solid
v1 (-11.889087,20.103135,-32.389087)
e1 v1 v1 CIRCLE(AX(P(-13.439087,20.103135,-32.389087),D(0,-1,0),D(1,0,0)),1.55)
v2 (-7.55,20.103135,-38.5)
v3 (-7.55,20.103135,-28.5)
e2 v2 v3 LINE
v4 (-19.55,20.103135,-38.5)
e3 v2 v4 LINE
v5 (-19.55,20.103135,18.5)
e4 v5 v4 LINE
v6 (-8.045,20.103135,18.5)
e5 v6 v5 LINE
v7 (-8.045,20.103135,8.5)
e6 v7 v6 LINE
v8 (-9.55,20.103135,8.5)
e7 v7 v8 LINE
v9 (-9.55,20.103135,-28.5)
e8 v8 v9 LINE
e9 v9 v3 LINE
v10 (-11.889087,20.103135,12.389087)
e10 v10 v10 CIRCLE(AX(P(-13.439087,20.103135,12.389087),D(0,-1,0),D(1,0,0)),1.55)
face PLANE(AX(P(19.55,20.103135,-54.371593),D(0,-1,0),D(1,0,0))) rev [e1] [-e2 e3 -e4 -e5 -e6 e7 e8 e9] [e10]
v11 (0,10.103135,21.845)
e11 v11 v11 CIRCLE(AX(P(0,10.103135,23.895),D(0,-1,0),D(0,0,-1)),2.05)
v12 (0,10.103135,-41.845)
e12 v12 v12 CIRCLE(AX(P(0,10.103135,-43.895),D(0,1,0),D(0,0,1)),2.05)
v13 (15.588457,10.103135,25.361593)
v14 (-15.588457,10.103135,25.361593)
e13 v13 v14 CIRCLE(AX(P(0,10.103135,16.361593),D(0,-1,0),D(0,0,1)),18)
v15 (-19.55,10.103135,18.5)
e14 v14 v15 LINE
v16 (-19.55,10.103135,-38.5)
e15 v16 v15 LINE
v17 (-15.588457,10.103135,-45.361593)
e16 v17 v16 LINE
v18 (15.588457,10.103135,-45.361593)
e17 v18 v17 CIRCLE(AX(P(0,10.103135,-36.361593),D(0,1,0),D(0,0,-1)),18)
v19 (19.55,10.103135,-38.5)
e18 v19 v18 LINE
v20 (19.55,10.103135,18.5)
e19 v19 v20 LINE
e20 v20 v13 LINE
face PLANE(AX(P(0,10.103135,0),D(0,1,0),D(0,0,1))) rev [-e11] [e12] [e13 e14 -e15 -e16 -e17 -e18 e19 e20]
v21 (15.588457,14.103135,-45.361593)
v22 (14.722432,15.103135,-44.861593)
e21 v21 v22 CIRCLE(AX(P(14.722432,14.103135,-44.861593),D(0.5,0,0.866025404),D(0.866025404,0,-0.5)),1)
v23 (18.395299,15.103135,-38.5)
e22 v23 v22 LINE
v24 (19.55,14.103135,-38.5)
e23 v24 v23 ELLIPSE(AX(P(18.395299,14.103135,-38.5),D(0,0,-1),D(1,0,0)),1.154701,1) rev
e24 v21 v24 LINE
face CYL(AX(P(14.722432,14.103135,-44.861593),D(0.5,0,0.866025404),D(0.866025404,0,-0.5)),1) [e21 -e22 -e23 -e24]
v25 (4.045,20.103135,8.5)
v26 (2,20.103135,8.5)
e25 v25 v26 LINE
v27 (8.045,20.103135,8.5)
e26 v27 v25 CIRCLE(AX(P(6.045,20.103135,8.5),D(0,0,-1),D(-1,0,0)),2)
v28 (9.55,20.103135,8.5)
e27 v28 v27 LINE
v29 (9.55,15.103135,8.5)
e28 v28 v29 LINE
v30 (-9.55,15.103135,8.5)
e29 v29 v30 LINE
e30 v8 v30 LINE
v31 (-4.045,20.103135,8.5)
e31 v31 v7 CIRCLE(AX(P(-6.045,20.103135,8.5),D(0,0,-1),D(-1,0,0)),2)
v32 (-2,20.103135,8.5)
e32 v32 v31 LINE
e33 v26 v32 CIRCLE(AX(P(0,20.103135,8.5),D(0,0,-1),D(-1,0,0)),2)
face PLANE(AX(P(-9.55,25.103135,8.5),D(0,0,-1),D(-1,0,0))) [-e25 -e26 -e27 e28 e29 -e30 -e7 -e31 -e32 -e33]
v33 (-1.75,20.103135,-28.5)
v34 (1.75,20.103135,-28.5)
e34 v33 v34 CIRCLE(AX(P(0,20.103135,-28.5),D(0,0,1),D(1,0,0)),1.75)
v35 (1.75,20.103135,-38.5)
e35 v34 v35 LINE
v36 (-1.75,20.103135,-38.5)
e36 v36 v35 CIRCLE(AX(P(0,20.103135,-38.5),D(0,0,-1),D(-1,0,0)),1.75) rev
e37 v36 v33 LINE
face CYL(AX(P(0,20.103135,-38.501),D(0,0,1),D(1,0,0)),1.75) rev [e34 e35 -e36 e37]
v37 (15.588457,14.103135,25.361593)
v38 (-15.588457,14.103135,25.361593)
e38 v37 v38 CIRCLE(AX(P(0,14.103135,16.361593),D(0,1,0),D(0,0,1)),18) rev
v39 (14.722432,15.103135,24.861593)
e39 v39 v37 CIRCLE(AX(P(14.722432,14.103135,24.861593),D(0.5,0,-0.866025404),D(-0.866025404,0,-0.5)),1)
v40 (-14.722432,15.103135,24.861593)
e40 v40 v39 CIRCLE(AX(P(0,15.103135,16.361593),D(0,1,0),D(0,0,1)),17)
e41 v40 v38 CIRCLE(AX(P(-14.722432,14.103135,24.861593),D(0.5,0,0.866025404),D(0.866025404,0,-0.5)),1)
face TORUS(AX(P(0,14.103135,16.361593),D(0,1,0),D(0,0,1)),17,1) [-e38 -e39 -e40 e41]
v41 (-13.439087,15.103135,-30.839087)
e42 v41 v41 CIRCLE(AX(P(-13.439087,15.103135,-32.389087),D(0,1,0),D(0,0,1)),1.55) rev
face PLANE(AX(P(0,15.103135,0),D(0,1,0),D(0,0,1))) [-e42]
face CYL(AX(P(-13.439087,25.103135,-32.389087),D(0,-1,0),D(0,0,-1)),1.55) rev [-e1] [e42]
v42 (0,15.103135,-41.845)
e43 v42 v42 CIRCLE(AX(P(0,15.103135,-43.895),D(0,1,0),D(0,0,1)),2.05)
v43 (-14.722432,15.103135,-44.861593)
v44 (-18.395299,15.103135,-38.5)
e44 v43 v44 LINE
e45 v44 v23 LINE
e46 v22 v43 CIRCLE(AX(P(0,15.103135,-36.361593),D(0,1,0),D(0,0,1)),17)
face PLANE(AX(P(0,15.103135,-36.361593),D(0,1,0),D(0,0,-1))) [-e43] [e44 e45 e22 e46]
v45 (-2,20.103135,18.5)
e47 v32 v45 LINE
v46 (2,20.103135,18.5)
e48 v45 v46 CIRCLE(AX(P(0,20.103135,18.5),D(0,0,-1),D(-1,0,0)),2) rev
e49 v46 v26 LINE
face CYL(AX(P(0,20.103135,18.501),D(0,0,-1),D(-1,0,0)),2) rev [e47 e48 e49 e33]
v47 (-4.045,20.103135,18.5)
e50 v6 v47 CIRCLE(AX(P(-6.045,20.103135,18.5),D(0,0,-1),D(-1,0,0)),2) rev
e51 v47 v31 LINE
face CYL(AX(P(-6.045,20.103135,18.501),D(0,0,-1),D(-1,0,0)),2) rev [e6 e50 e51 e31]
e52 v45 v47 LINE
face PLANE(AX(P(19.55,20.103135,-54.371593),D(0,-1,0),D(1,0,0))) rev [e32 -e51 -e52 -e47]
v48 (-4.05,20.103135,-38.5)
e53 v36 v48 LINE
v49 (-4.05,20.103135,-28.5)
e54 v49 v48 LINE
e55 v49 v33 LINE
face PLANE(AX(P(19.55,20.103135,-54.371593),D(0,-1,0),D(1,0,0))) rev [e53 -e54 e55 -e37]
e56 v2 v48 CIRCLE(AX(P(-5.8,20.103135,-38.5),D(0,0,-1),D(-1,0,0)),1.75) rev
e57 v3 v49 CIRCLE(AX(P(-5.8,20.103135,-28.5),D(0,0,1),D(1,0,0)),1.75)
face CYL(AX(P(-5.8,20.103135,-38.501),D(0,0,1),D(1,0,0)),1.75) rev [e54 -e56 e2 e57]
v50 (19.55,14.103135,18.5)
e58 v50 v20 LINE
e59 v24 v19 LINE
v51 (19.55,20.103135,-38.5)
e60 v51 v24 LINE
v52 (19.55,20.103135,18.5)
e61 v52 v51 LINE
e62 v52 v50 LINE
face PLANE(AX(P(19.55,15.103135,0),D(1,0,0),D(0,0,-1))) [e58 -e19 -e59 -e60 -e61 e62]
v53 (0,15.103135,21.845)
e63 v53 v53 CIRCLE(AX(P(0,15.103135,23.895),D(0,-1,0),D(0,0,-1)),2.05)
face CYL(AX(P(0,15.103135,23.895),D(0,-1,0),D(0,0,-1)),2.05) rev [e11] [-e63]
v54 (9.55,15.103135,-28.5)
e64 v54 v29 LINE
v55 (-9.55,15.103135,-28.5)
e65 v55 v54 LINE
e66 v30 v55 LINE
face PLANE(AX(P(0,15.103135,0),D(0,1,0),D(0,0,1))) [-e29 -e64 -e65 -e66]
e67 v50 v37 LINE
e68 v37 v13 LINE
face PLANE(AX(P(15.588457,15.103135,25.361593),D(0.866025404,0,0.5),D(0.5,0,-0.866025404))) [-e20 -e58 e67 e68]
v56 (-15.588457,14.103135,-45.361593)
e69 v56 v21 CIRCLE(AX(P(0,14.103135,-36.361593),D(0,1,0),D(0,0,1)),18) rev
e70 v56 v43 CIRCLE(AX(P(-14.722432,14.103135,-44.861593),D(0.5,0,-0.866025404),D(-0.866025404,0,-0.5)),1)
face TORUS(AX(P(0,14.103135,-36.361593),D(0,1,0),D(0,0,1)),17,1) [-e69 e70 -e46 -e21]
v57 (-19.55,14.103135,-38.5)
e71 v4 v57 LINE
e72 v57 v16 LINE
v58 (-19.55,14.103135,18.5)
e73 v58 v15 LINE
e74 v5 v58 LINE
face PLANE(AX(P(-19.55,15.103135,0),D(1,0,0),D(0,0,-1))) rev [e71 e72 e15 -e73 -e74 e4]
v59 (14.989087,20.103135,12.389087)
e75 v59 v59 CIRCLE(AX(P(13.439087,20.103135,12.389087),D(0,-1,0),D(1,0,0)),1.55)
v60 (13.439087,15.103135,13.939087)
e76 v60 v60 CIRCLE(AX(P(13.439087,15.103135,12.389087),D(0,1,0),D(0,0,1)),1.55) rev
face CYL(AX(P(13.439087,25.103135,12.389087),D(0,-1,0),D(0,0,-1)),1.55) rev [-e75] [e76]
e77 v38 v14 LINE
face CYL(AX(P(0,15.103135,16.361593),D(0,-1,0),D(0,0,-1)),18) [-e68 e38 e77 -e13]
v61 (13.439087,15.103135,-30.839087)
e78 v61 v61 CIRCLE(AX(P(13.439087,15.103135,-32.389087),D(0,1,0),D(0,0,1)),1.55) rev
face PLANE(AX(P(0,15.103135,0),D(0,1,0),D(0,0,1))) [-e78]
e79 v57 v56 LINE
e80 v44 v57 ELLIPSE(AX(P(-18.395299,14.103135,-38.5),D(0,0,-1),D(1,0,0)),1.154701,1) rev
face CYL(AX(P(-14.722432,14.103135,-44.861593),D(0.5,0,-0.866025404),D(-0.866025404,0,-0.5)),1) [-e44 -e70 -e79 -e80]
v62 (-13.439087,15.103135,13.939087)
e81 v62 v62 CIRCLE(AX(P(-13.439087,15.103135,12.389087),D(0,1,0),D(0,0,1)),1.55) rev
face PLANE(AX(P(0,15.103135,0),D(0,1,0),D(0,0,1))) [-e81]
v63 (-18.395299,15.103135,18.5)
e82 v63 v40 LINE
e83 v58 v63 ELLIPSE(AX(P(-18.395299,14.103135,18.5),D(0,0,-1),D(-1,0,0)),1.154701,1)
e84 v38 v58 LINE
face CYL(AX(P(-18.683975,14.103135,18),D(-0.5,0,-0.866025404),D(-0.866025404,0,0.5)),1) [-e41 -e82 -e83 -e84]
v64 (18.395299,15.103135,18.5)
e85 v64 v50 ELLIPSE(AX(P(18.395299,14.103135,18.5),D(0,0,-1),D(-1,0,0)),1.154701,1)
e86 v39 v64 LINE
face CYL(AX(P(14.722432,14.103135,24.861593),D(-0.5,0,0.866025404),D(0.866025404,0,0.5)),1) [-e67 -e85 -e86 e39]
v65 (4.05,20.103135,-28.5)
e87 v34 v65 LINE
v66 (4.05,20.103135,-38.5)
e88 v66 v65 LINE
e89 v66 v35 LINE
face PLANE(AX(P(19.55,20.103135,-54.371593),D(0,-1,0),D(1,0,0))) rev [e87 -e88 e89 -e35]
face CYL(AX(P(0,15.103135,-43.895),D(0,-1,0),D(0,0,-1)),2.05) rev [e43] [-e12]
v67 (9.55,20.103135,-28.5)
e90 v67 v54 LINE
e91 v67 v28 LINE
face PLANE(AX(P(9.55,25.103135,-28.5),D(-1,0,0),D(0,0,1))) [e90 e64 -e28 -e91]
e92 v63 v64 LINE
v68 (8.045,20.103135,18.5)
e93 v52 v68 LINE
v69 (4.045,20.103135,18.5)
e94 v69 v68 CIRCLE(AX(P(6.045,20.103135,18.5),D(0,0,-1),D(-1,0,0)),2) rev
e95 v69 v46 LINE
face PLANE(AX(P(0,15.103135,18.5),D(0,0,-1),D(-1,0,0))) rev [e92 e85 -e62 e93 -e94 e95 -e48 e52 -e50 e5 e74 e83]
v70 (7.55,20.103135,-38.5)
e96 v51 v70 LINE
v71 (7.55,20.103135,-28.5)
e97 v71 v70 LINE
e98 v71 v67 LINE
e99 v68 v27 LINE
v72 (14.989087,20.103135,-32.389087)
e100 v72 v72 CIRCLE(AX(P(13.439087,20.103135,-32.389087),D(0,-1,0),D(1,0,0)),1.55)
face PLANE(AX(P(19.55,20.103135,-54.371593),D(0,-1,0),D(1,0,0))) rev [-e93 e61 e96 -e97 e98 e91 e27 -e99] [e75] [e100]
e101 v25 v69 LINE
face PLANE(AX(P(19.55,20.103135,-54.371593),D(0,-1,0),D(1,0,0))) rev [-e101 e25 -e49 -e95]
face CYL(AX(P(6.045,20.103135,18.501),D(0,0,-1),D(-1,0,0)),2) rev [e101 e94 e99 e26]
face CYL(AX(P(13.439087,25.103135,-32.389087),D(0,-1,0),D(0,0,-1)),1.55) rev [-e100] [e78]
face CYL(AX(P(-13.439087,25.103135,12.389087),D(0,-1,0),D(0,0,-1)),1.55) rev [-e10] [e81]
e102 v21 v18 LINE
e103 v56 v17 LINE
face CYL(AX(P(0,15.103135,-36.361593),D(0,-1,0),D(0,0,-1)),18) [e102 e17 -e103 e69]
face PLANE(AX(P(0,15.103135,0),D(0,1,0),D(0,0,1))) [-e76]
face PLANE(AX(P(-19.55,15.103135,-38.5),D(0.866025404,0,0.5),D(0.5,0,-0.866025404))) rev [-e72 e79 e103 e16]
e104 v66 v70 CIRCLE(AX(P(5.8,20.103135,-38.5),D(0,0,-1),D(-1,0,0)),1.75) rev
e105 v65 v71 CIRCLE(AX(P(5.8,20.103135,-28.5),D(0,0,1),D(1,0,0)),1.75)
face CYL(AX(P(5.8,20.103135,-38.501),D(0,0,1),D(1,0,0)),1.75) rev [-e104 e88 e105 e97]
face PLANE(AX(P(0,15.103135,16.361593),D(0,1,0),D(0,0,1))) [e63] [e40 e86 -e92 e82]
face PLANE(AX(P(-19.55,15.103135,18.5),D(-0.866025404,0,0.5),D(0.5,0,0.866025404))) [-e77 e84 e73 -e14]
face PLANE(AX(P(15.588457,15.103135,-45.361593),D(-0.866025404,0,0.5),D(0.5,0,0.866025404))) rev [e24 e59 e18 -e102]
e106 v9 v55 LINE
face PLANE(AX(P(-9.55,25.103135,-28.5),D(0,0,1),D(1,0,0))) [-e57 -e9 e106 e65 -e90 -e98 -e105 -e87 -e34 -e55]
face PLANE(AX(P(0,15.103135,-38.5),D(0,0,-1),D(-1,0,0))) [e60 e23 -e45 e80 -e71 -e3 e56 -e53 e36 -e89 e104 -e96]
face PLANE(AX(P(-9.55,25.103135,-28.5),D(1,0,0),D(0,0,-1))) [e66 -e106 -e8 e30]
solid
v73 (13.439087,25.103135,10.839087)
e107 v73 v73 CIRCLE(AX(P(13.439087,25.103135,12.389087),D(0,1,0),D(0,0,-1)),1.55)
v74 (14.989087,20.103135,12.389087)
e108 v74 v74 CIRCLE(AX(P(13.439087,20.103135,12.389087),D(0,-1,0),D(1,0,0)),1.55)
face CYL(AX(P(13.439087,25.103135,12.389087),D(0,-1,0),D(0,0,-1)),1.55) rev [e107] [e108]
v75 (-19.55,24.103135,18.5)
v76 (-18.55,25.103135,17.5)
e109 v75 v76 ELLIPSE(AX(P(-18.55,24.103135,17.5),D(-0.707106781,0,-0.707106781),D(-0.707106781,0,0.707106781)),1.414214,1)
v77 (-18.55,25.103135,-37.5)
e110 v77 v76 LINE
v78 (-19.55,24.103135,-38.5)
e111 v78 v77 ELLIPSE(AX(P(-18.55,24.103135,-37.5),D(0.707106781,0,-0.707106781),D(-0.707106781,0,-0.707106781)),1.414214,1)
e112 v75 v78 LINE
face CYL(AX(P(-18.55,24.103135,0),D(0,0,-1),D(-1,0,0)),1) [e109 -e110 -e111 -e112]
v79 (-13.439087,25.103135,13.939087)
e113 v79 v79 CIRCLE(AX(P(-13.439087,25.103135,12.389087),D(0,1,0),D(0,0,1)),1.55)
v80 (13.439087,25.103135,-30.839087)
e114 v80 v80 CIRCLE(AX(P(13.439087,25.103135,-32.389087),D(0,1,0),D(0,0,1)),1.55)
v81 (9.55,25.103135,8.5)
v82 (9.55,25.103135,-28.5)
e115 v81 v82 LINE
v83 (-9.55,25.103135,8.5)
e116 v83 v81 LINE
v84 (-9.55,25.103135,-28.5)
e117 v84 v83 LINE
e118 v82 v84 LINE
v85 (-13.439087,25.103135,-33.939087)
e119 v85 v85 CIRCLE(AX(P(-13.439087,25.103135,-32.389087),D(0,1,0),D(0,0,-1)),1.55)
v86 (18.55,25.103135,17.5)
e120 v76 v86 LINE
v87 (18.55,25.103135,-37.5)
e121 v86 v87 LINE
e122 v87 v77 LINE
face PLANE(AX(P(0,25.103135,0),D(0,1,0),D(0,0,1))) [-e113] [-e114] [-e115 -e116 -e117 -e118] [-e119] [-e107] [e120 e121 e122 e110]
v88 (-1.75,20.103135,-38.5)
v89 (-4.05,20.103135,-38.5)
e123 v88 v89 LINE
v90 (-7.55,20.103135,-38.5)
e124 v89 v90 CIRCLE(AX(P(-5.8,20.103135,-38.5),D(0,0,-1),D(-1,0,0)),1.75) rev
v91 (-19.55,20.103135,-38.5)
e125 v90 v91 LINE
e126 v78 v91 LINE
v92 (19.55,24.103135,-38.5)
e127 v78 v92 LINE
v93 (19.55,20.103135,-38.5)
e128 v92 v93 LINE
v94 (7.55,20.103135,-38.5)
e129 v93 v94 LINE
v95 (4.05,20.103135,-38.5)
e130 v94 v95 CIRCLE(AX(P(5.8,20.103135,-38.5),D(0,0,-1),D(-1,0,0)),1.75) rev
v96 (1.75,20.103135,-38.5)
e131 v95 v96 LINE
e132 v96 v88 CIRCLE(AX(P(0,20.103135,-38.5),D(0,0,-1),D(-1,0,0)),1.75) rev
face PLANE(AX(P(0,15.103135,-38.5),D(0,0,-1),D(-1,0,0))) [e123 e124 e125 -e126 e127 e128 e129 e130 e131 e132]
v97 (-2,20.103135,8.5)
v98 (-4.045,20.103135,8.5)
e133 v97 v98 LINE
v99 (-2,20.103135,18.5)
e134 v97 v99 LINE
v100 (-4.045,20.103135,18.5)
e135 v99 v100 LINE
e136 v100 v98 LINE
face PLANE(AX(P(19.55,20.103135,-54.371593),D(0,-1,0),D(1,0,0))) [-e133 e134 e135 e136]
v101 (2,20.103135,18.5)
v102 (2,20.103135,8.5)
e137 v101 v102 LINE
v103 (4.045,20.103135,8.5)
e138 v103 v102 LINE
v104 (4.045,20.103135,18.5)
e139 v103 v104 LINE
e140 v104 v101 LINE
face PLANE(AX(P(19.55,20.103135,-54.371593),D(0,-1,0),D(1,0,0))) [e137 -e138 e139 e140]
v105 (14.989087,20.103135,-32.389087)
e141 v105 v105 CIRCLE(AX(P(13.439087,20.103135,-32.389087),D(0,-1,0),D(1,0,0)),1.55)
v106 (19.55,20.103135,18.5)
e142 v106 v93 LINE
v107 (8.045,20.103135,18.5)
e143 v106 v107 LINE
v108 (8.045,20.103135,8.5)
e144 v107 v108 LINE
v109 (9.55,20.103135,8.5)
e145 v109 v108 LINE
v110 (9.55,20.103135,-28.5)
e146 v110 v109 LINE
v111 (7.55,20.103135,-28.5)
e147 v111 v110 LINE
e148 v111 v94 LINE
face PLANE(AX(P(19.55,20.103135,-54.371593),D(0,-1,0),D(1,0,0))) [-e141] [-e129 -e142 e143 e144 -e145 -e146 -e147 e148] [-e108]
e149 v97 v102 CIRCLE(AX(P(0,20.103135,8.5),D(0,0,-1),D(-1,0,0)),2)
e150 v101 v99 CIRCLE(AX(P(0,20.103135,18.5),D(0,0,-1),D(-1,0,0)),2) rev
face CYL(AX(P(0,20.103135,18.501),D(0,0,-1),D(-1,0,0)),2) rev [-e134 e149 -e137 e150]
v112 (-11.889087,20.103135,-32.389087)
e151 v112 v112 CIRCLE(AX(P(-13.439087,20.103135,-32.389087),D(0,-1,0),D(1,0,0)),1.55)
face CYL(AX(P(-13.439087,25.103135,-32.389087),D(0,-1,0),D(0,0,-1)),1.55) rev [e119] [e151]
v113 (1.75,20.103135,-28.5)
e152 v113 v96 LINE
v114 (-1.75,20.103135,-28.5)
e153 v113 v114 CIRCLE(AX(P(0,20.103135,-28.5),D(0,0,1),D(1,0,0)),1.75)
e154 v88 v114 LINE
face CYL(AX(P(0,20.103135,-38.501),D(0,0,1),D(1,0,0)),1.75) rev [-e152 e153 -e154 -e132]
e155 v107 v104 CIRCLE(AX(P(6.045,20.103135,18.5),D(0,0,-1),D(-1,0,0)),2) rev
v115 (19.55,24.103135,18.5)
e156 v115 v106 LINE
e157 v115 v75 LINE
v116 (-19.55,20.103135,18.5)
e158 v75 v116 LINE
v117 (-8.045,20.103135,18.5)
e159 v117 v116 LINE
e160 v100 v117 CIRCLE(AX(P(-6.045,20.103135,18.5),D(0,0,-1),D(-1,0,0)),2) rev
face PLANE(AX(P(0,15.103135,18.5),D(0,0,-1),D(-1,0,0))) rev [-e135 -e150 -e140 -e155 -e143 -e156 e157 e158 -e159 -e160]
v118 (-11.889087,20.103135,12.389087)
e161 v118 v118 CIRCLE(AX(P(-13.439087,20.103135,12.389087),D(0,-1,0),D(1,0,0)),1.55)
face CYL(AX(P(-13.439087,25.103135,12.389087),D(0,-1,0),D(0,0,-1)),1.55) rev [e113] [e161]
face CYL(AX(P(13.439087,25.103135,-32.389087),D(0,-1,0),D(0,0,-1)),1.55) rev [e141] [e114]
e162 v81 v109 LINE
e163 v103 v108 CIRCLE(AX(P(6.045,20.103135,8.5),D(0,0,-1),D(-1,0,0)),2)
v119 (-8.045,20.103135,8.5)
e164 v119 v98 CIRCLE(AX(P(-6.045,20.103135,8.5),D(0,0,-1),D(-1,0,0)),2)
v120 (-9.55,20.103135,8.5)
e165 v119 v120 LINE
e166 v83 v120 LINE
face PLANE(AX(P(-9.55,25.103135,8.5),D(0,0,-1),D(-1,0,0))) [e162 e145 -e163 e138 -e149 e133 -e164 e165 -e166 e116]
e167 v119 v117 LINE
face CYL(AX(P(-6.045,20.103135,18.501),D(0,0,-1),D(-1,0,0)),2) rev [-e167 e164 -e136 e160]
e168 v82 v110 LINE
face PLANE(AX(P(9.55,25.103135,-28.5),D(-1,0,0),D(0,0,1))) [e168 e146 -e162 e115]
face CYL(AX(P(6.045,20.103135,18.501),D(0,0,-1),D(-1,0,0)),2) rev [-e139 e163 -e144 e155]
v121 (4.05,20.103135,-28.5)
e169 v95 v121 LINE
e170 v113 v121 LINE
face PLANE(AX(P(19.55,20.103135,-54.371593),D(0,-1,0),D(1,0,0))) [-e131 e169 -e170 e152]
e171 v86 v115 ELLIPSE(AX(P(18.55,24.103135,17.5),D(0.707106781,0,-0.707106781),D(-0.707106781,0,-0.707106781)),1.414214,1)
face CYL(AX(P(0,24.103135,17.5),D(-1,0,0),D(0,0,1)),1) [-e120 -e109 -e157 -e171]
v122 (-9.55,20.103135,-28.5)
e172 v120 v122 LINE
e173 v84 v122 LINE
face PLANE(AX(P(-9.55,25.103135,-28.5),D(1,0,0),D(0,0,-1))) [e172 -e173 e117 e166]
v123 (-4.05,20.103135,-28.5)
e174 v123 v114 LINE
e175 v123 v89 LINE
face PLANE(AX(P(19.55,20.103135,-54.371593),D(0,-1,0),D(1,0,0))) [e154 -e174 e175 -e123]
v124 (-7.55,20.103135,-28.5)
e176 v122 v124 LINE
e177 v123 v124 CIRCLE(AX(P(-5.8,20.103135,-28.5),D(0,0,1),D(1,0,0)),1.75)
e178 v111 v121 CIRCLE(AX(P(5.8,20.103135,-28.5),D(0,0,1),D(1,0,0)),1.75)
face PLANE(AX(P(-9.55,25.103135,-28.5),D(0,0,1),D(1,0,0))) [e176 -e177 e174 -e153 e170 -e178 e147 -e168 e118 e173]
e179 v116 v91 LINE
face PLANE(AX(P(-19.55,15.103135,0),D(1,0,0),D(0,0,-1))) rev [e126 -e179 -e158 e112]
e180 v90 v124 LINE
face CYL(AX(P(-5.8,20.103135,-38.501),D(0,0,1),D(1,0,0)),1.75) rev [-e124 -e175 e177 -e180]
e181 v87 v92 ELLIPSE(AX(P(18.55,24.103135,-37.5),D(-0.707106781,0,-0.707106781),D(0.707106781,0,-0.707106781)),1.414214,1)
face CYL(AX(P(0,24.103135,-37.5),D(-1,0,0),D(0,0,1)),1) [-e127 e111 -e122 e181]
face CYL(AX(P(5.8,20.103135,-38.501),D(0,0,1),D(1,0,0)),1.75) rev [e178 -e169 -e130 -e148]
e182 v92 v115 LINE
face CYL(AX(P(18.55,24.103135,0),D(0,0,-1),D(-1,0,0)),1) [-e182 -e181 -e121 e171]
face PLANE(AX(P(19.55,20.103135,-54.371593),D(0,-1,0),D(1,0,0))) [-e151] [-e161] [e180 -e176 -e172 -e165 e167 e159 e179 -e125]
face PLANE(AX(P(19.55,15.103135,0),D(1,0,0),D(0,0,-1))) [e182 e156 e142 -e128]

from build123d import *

# Parameters (mm, degrees)
BOSS_EXTRU_1_DEPTH           = 20
CONG_1_R                     = 0.5
CONG_2_R                     = 1
ESQUISSE3_W                  = 39.099999999999994
ESQUISSE3_H                  = 57
ESQUISSE3_R                  = 1.5499999999999992
ESQUISSE3_R_2                = 1.5499999999999883
ESQUISSE3_W_2                = 19.1
ESQUISSE3_H_2                = 37
BOSS_EXTRU_2_DEPTH           = 5
ESQUISSE3_3_W                = 39.099999999999994
ESQUISSE3_3_H                = 57
ESQUISSE3_3_R                = 1.5499999999999992
ESQUISSE3_3_R_2              = 1.5499999999999883
ESQUISSE3_3_W_2              = 19.1
ESQUISSE3_3_H_2              = 37
BOSS_EXTRU_4_DEPTH           = 15
TROUS_MOTEUR_REACH           = 58.757
ESQUISSE8_R                  = 1.7500000000000038
ESQUISSE8_R_2                = 1.750000000000003
ENL_V_MAT_EXTRU_1_DEPTH      = 50.94617008369277
TROUS_CABLES_PUISSANCE_REACH = 58.757
ESQUISSE9_R                  = 2
ESQUISSE9_R_2                = 2.000000000000005
ESQUISSE9_R_3                = 2.0000000000000053
ENL_V_MAT_EXTRU_5_REACH      = 51.946
ESQUISSE12_W                 = 5.9
ESQUISSE12_H                 = 1.620000000000001
ESQUISSE13_R                 = 2.05
BOSS_EXTRU_5_DEPTH           = 5
CONG_3_R                     = 1
FRACTIONNER1_SURFACE_1_BACK  = 99.11
FRACTIONNER1_SURFACE_1_DEPTH = 198.22
FRACTIONNER1_SURFACE_2_BACK  = 99.11
FRACTIONNER1_SURFACE_2_DEPTH = 198.22


with BuildPart() as part:
    # Esquisse1 → Boss.-Extru.1 (new body)
    with BuildSketch(Plane.XY):
        Polygon((-1.176e-14, 10.103135382441117), (-2.578e-14, 4.840000000000001), (3.5, 4.840000000000001), (5.71, 6.983135382441116), (5.71, 8.483135382441116), (2.95, 8.483135382441116), (2.95, 10.103135382441117), align=None)
        Polygon((-3.5, 4.840000000000001), (-2.576e-14, 4.840000000000001), (-1.176e-14, 10.103135382441117), (-2.95, 10.103135382441117), (-2.95, 8.483135382441116), (-5.71, 8.483135382441116), (-5.71, 6.983135382441116), align=None)
    extrude(amount=-BOSS_EXTRU_1_DEPTH)

    # Congé1
    cong_1_edges = [part.edges().sort_by_distance(p)[0] for p in [
        (5.71, 7.733135382441116, 0),
        (4.605, 5.911567691220558, 0),
        (0, 4.840000000000001, 0),
        (-4.605, 5.911567691220558, 0),
        (-5.71, 7.733135382441116, 0),
        (-5.71, 7.733135382441116, -20),
        (-4.605, 5.911567691220558, -20),
        (0, 4.840000000000001, -20),
        (4.605, 5.911567691220558, -20),
        (5.71, 7.733135382441116, -20),
    ]]
    fillet(cong_1_edges, radius=CONG_1_R)

    # Congé2
    # the kernel refuses this fillet: 1 mm, written as the material it takes off along each edge
    with BuildSketch(Plane(origin=(4.71, 7.4063748668930085, -20), x_dir=(1, 0, 0), z_dir=(0, 1, 0))) as cong_2_piece_1:
        with BuildLine():
            CenterArc((0.5, -0.5), 0.5, 0, 90)
            Line((1, -0.5), (1, 0))
            Line((1, 0), (0.5, 0))
        make_face()
    revolve(axis=Axis((4.71, 7.4063748668930085, -20), (0, 0, -1)), revolution_arc=45.87999999999987, mode=Mode.SUBTRACT)
    with BuildSketch(Plane(origin=(-4.710000000000001, 7.40637486689301, -20), x_dir=(-0.6961634275566162, -0.717883334625219, 0), z_dir=(0.717883334625219, -0.6961634275566162, 0))) as cong_2_piece_2:
        with BuildLine():
            CenterArc((0.5, -0.5), 0.5, 0, 90)
            Line((1, -0.5), (1, 0))
            Line((1, 0), (0.5, 0))
        make_face()
    revolve(axis=Axis((-4.710000000000001, 7.40637486689301, -20), (0, 0, -1)), revolution_arc=45.87999999999987, mode=Mode.SUBTRACT)
    with BuildSketch(Plane(origin=(4.71, 7.4063748668930085, 0), x_dir=(0.6961634275566162, -0.717883334625219, 0), z_dir=(-0.717883334625219, -0.6961634275566162, 0))) as cong_2_piece_3:
        with BuildLine():
            CenterArc((0.5, -0.5), 0.5, 0, 90)
            Line((1, -0.5), (1, 0))
            Line((1, 0), (0.5, 0))
        make_face()
    revolve(axis=Axis((4.71, 7.4063748668930085, 0), (0, 0, 1)), revolution_arc=45.87999999999987, mode=Mode.SUBTRACT)
    with BuildSketch(Plane(origin=(-4.710000000000001, 7.40637486689301, 0), x_dir=(-1, 0, 0), z_dir=(0, 1, 0))) as cong_2_piece_4:
        with BuildLine():
            CenterArc((0.5, -0.5), 0.5, 0, 90)
            Line((1, -0.5), (1, 0))
            Line((1, 0), (0.5, 0))
        make_face()
    revolve(axis=Axis((-4.710000000000001, 7.40637486689301, 0), (0, 0, 1)), revolution_arc=45.87999999999987, mode=Mode.SUBTRACT)
    with BuildSketch(Plane(origin=(-5.71, 6.983135382441116, 1.1e-16), x_dir=(0.717883334625219, -0.6961634275566161, 0), z_dir=(0, 0, -1))) as cong_2_piece_5:
        with BuildLine():
            CenterArc((CONG_2_R * 0.423239484452, -CONG_2_R), CONG_2_R, 90.00000000000003, 45.879999999999825)
            Line((-CONG_2_R * 0.294643850173, -CONG_2_R * 0.303836572443), (0, 0))
            Line((0, 0), (CONG_2_R * 0.423239484452, 0))
        make_face()
    extrude(amount=20, mode=Mode.SUBTRACT)
    with BuildSketch(Plane(origin=(5.71, 6.983135382441116, 1.1e-16), x_dir=(-0.7178833346252179, -0.6961634275566172, 0), z_dir=(0, 0, -1))) as cong_2_piece_6:
        with BuildLine():
            CenterArc((CONG_2_R * 0.423239484452, CONG_2_R), CONG_2_R, 224.12000000000015, 45.87999999999994)
            Line((-CONG_2_R * 0.294643850173, CONG_2_R * 0.303836572443), (0, 0))
            Line((0, 0), (CONG_2_R * 0.423239484452, 2e-17))
        make_face()
    extrude(amount=20, mode=Mode.SUBTRACT)

    # Esquisse3 → Boss.-Extru.2 (add)
    # profile 1 of 6: a face of its own
    with BuildSketch(Plane(origin=(0, 10.103135382441117, 0), x_dir=(1, 0, 0), z_dir=(0, 1, 0))):
        with Locations((0, 10)):
            Rectangle(ESQUISSE3_W, ESQUISSE3_H)
        with Locations((13.43908729652601, -12.389087296526013)):
            Circle(ESQUISSE3_R, mode=Mode.SUBTRACT)
        with Locations((-13.43908729652601, -12.389087296526013)):
            Circle(ESQUISSE3_R, mode=Mode.SUBTRACT)
        with Locations((13.439087296526004, 32.389087296526014)):
            Circle(ESQUISSE3_R_2, mode=Mode.SUBTRACT)
        with Locations((-13.439087296526015, 32.389087296526014)):
            Circle(ESQUISSE3_R_2, mode=Mode.SUBTRACT)
        with Locations((1.78e-15, 10.000000000000004)):
            Rectangle(ESQUISSE3_W_2, ESQUISSE3_H_2, mode=Mode.SUBTRACT)
    # profile 2 of 6: a face of its own
    with BuildSketch(Plane(origin=(0, 10.103135382441117, 0), x_dir=(1, 0, 0), z_dir=(0, 1, 0))):
        with Locations((13.439087296526004, 32.389087296526014)):
            Circle(ESQUISSE3_R_2)
    # profile 3 of 6: a face of its own
    with BuildSketch(Plane(origin=(0, 10.103135382441117, 0), x_dir=(1, 0, 0), z_dir=(0, 1, 0))):
        with Locations((-13.439087296526015, 32.389087296526014)):
            Circle(ESQUISSE3_R_2)
    # profile 4 of 6: a face of its own
    with BuildSketch(Plane(origin=(0, 10.103135382441117, 0), x_dir=(1, 0, 0), z_dir=(0, 1, 0))):
        with Locations((-13.43908729652601, -12.389087296526013)):
            Circle(ESQUISSE3_R)
    # profile 5 of 6: a face of its own
    with BuildSketch(Plane(origin=(0, 10.103135382441117, 0), x_dir=(1, 0, 0), z_dir=(0, 1, 0))):
        with Locations((13.43908729652601, -12.389087296526013)):
            Circle(ESQUISSE3_R)
    # profile 6 of 6: a face of its own
    with BuildSketch(Plane(origin=(0, 10.103135382441117, 0), x_dir=(1, 0, 0), z_dir=(0, 1, 0))):
        Polygon((-9.549999999999999, 28.500000000000004), (-9.549999999999999, -8.499999999999996), (9.550000000000002, -8.499999999999998), (9.550000000000002, 28.500000000000004), align=None)
    extrude(amount=BOSS_EXTRU_2_DEPTH)

    # Esquisse3<3> → Boss.-Extru.4 (add)
    with BuildSketch(Plane(origin=(0, 10.103135382441117, 0), x_dir=(1, 0, 0), z_dir=(0, 1, 0))):
        with Locations((0, 10)):
            Rectangle(ESQUISSE3_3_W, ESQUISSE3_3_H)
        with Locations(Location((-13.43908729652601, -12.389087296526013, 0), (0, 0, 270))):
            Circle(ESQUISSE3_3_R, mode=Mode.SUBTRACT)
        with Locations(Location((13.43908729652601, -12.389087296526013, 0), (0, 0, 90))):
            Circle(ESQUISSE3_3_R, mode=Mode.SUBTRACT)
        with Locations(Location((13.439087296526004, 32.389087296526014, 0), (0, 0, 270))):
            Circle(ESQUISSE3_3_R_2, mode=Mode.SUBTRACT)
        with Locations(Location((-13.439087296526015, 32.389087296526014, 0), (0, 0, 90))):
            Circle(ESQUISSE3_3_R_2, mode=Mode.SUBTRACT)
        with Locations((1.78e-15, 10.000000000000004)):
            Rectangle(ESQUISSE3_3_W_2, ESQUISSE3_3_H_2, mode=Mode.SUBTRACT)
    extrude(amount=BOSS_EXTRU_4_DEPTH)

    # Esquisse8 → Trous_moteur (cut, up to next)
    with BuildSketch(Plane.XY.offset(-28.500000000000004), mode=Mode.PRIVATE) as trous_moteur_sk1:
        with Locations((5.800000000000003, 20.103135382441113)):
            Circle(ESQUISSE8_R)
    trous_moteur_tool1 = extrude(trous_moteur_sk1.sketch, amount=-TROUS_MOTEUR_REACH, mode=Mode.PRIVATE) & part.part
    # Esquisse8 → Trous_moteur (cut, up to next)
    with BuildSketch(Plane.XY.offset(-28.500000000000004), mode=Mode.PRIVATE) as trous_moteur_sk2:
        with Locations((3.47e-15, 20.10313538244111)):
            Circle(ESQUISSE8_R_2)
    trous_moteur_tool2 = extrude(trous_moteur_sk2.sketch, amount=-TROUS_MOTEUR_REACH, mode=Mode.PRIVATE) & part.part
    # Esquisse8 → Trous_moteur (cut, up to next)
    with BuildSketch(Plane.XY.offset(-28.500000000000004), mode=Mode.PRIVATE) as trous_moteur_sk3:
        with Locations((-5.799999999999996, 20.10313538244111)):
            Circle(ESQUISSE8_R)
    trous_moteur_tool3 = extrude(trous_moteur_sk3.sketch, amount=-TROUS_MOTEUR_REACH, mode=Mode.PRIVATE) & part.part
    add(trous_moteur_tool1.solids().sort_by_distance((5.8, 20.103135, -28.5))[0], mode=Mode.SUBTRACT)
    add(trous_moteur_tool2.solids().sort_by_distance((0, 20.103135, -28.5))[0], mode=Mode.SUBTRACT)
    add(trous_moteur_tool3.solids().sort_by_distance((-5.8, 20.103135, -28.5))[0], mode=Mode.SUBTRACT)

    # Esquisse5 → Enlèv. mat.-Extru.1 (cut, through all)
    with BuildSketch(Plane.XY):
        with BuildLine():
            Line((-5.209999999999999, 8.483135382441116), (-5.71, 8.483135382441116))
            Line((-5.71, 8.483135382441116), (-5.71, 7.4063748668930085))
            ThreePointArc((-5.71, 7.4063748668930085), (-5.630913521335368, 7.01660790289825), (-5.406163427556616, 6.68849153226779))
            Line((-5.406163427556616, 6.68849153226779), (-3.5, 4.840000000000001))
            Line((-3.5, 4.840000000000001), (3.5, 4.840000000000001))
            Line((3.5, 4.840000000000001), (5.406163427556617, 6.68849153226779))
            ThreePointArc((5.406163427556617, 6.68849153226779), (5.630913521335369, 7.01660790289825), (5.71, 7.406374866893009))
            Line((5.71, 7.406374866893009), (5.71, 8.483135382441116))
            Line((5.71, 8.483135382441116), (5.209999999999999, 8.483135382441116))
            Line((5.209999999999999, 8.483135382441116), (2.95, 8.483135382441116))
            Line((2.95, 8.483135382441116), (-2.95, 8.483135382441116))
            Line((-2.95, 8.483135382441116), (-5.209999999999999, 8.483135382441116))
        make_face()
    extrude(amount=-ENL_V_MAT_EXTRU_1_DEPTH, mode=Mode.SUBTRACT)

    # Esquisse9 → Trous_cables_puissance (cut, up to next)
    with BuildSketch(Plane(origin=(0, 0, 8.499999999999998), x_dir=(-1, 0, 0), z_dir=(0, 0, -1)), mode=Mode.PRIVATE) as trous_cables_puissance_sk1:
        with Locations((6.044999999999998, 20.103135382441113)):
            Circle(ESQUISSE9_R)
    trous_cables_puissance_tool1 = extrude(trous_cables_puissance_sk1.sketch, amount=-TROUS_CABLES_PUISSANCE_REACH, mode=Mode.PRIVATE) & part.part
    # Esquisse9 → Trous_cables_puissance (cut, up to next)
    with BuildSketch(Plane(origin=(0, 0, 8.499999999999998), x_dir=(-1, 0, 0), z_dir=(0, 0, -1)), mode=Mode.PRIVATE) as trous_cables_puissance_sk2:
        with Locations((-6.045000000000002, 20.103135382441113)):
            Circle(ESQUISSE9_R_2)
    trous_cables_puissance_tool2 = extrude(trous_cables_puissance_sk2.sketch, amount=-TROUS_CABLES_PUISSANCE_REACH, mode=Mode.PRIVATE) & part.part
    # Esquisse9 → Trous_cables_puissance (cut, up to next)
    with BuildSketch(Plane(origin=(0, 0, 8.499999999999998), x_dir=(-1, 0, 0), z_dir=(0, 0, -1)), mode=Mode.PRIVATE) as trous_cables_puissance_sk3:
        with Locations((-1.73e-15, 20.103135382441113)):
            Circle(ESQUISSE9_R_3)
    trous_cables_puissance_tool3 = extrude(trous_cables_puissance_sk3.sketch, amount=-TROUS_CABLES_PUISSANCE_REACH, mode=Mode.PRIVATE) & part.part
    add(trous_cables_puissance_tool1.solids().sort_by_distance((-6.045, 20.103135, 8.5))[0], mode=Mode.SUBTRACT)
    add(trous_cables_puissance_tool2.solids().sort_by_distance((6.045, 20.103135, 8.5))[0], mode=Mode.SUBTRACT)
    add(trous_cables_puissance_tool3.solids().sort_by_distance((0, 20.103135, 8.5))[0], mode=Mode.SUBTRACT)

    # Esquisse12 → Enlèv. mat.-Extru.5 (cut, up to next)
    with BuildSketch(Plane(origin=(0, 0, -20), x_dir=(-1, 0, 0), z_dir=(0, 0, -1)), mode=Mode.PRIVATE) as enl_v_mat_extru_5_sk1:
        with Locations((0, 9.293135382441116)):
            Rectangle(ESQUISSE12_W, ESQUISSE12_H)
    enl_v_mat_extru_5_tool1 = extrude(enl_v_mat_extru_5_sk1.sketch, amount=-ENL_V_MAT_EXTRU_5_REACH, mode=Mode.PRIVATE) & part.part
    add(enl_v_mat_extru_5_tool1.solids().sort_by_distance((0, 9.293135, -20))[0], mode=Mode.SUBTRACT)

    # Esquisse13 → Boss.-Extru.5 (add)
    with BuildSketch(Plane.XZ.offset(-10.103135382441117)):
        with BuildLine():
            Line((-19.549999999999997, 18.5), (-15.58845726811995, 25.361593287971516))
            ThreePointArc((-15.58845726811995, 25.361593287971516), (-5.708e-14, 34.36159328797158), (15.588457268119866, 25.361593287971584))
            Line((15.588457268119866, 25.361593287971584), (19.549999999999997, 18.5))
            Line((19.549999999999997, 18.5), (-19.549999999999997, 18.5))
        make_face()
        with Locations(Location((0, 23.895, 0), (0, 0, 270))):
            Circle(ESQUISSE13_R, mode=Mode.SUBTRACT)
    boss_extru_5 = extrude(amount=-BOSS_EXTRU_5_DEPTH)

    # Symétrie1: Boss.-Extru.5 across plane
    add(boss_extru_5.mirror(Plane.XY.offset(-10)))

    # Congé3
    cong_3_edges = [part.edges().sort_by_distance(p)[0] for p in [
        (19.549999999999997, 25.103135382441117, -10),
        (0, 25.103135382441117, -38.5),
        (-19.549999999999997, 25.103135382441117, -10),
        (0, 25.103135382441117, 18.5),
        (-17.569228634059975, 15.103135382441117, 21.930796643985758),
        (-6.084e-14, 15.103135382441117, 34.36159328797157),
        (17.569228634059932, 15.103135382441117, 21.930796643985794),
        (17.569228634059932, 15.103135382441117, -41.93079664398579),
        (-6.084e-14, 15.103135382441117, -54.36159328797157),
        (-17.56922863405997, 15.103135382441117, -41.93079664398576),
    ]]
    fillet(cong_3_edges, radius=CONG_3_R)


with BuildPart() as body_2:
    # Fractionner1: the piece behind the surface
    add(part.part)
    # Fractionner1 surface: a surface, the sketch's curves swept straight by 198.22 mm
    with BuildLine(Plane.XY.offset(18.5).offset(-FRACTIONNER1_SURFACE_1_BACK), mode=Mode.PRIVATE) as fractionner1_surface_1_path:
        Line((19.549999999999997, 20.103135382441113), (-19.549999999999997, 20.10313538244111))
        Line((-19.549999999999997, 20.10313538244111), (-19.549999999999997, 24.103135382441113))
        ThreePointArc((-19.549999999999997, 24.103135382441113), (-19.257106781186547, 24.810242163627663), (-18.549999999999997, 25.103135382441117))
        Line((-18.549999999999997, 25.103135382441117), (18.549999999999997, 25.103135382441117))
        ThreePointArc((18.549999999999997, 25.103135382441117), (19.257106781186543, 24.81024216362766), (19.549999999999997, 24.103135382441113))
        Line((19.549999999999997, 24.103135382441113), (19.549999999999997, 20.103135382441113))
    fractionner1_surface_1 = Shell.extrude(fractionner1_surface_1_path.wire(), (0 * FRACTIONNER1_SURFACE_1_DEPTH, 0 * FRACTIONNER1_SURFACE_1_DEPTH, 1 * FRACTIONNER1_SURFACE_1_DEPTH))
    split(bisect_by=fractionner1_surface_1, keep=Keep.BOTTOM)


with BuildPart() as part_1:
    add(part.part)

    # Fractionner1: split by a surface, the side it looks to stays
    # Fractionner1 surface: a surface, the sketch's curves swept straight by 198.22 mm
    with BuildLine(Plane.XY.offset(18.5).offset(-FRACTIONNER1_SURFACE_2_BACK), mode=Mode.PRIVATE) as fractionner1_surface_2_path:
        Line((19.549999999999997, 20.103135382441113), (-19.549999999999997, 20.10313538244111))
        Line((-19.549999999999997, 20.10313538244111), (-19.549999999999997, 24.103135382441113))
        ThreePointArc((-19.549999999999997, 24.103135382441113), (-19.257106781186547, 24.810242163627663), (-18.549999999999997, 25.103135382441117))
        Line((-18.549999999999997, 25.103135382441117), (18.549999999999997, 25.103135382441117))
        ThreePointArc((18.549999999999997, 25.103135382441117), (19.257106781186543, 24.81024216362766), (19.549999999999997, 24.103135382441113))
        Line((19.549999999999997, 24.103135382441113), (19.549999999999997, 20.103135382441113))
    fractionner1_surface_2 = Shell.extrude(fractionner1_surface_2_path.wire(), (0 * FRACTIONNER1_SURFACE_2_DEPTH, 0 * FRACTIONNER1_SURFACE_2_DEPTH, 1 * FRACTIONNER1_SURFACE_2_DEPTH))
    split(bisect_by=fractionner1_surface_2, keep=Keep.TOP)


solid = Compound([body_2.part, part_1.part])
